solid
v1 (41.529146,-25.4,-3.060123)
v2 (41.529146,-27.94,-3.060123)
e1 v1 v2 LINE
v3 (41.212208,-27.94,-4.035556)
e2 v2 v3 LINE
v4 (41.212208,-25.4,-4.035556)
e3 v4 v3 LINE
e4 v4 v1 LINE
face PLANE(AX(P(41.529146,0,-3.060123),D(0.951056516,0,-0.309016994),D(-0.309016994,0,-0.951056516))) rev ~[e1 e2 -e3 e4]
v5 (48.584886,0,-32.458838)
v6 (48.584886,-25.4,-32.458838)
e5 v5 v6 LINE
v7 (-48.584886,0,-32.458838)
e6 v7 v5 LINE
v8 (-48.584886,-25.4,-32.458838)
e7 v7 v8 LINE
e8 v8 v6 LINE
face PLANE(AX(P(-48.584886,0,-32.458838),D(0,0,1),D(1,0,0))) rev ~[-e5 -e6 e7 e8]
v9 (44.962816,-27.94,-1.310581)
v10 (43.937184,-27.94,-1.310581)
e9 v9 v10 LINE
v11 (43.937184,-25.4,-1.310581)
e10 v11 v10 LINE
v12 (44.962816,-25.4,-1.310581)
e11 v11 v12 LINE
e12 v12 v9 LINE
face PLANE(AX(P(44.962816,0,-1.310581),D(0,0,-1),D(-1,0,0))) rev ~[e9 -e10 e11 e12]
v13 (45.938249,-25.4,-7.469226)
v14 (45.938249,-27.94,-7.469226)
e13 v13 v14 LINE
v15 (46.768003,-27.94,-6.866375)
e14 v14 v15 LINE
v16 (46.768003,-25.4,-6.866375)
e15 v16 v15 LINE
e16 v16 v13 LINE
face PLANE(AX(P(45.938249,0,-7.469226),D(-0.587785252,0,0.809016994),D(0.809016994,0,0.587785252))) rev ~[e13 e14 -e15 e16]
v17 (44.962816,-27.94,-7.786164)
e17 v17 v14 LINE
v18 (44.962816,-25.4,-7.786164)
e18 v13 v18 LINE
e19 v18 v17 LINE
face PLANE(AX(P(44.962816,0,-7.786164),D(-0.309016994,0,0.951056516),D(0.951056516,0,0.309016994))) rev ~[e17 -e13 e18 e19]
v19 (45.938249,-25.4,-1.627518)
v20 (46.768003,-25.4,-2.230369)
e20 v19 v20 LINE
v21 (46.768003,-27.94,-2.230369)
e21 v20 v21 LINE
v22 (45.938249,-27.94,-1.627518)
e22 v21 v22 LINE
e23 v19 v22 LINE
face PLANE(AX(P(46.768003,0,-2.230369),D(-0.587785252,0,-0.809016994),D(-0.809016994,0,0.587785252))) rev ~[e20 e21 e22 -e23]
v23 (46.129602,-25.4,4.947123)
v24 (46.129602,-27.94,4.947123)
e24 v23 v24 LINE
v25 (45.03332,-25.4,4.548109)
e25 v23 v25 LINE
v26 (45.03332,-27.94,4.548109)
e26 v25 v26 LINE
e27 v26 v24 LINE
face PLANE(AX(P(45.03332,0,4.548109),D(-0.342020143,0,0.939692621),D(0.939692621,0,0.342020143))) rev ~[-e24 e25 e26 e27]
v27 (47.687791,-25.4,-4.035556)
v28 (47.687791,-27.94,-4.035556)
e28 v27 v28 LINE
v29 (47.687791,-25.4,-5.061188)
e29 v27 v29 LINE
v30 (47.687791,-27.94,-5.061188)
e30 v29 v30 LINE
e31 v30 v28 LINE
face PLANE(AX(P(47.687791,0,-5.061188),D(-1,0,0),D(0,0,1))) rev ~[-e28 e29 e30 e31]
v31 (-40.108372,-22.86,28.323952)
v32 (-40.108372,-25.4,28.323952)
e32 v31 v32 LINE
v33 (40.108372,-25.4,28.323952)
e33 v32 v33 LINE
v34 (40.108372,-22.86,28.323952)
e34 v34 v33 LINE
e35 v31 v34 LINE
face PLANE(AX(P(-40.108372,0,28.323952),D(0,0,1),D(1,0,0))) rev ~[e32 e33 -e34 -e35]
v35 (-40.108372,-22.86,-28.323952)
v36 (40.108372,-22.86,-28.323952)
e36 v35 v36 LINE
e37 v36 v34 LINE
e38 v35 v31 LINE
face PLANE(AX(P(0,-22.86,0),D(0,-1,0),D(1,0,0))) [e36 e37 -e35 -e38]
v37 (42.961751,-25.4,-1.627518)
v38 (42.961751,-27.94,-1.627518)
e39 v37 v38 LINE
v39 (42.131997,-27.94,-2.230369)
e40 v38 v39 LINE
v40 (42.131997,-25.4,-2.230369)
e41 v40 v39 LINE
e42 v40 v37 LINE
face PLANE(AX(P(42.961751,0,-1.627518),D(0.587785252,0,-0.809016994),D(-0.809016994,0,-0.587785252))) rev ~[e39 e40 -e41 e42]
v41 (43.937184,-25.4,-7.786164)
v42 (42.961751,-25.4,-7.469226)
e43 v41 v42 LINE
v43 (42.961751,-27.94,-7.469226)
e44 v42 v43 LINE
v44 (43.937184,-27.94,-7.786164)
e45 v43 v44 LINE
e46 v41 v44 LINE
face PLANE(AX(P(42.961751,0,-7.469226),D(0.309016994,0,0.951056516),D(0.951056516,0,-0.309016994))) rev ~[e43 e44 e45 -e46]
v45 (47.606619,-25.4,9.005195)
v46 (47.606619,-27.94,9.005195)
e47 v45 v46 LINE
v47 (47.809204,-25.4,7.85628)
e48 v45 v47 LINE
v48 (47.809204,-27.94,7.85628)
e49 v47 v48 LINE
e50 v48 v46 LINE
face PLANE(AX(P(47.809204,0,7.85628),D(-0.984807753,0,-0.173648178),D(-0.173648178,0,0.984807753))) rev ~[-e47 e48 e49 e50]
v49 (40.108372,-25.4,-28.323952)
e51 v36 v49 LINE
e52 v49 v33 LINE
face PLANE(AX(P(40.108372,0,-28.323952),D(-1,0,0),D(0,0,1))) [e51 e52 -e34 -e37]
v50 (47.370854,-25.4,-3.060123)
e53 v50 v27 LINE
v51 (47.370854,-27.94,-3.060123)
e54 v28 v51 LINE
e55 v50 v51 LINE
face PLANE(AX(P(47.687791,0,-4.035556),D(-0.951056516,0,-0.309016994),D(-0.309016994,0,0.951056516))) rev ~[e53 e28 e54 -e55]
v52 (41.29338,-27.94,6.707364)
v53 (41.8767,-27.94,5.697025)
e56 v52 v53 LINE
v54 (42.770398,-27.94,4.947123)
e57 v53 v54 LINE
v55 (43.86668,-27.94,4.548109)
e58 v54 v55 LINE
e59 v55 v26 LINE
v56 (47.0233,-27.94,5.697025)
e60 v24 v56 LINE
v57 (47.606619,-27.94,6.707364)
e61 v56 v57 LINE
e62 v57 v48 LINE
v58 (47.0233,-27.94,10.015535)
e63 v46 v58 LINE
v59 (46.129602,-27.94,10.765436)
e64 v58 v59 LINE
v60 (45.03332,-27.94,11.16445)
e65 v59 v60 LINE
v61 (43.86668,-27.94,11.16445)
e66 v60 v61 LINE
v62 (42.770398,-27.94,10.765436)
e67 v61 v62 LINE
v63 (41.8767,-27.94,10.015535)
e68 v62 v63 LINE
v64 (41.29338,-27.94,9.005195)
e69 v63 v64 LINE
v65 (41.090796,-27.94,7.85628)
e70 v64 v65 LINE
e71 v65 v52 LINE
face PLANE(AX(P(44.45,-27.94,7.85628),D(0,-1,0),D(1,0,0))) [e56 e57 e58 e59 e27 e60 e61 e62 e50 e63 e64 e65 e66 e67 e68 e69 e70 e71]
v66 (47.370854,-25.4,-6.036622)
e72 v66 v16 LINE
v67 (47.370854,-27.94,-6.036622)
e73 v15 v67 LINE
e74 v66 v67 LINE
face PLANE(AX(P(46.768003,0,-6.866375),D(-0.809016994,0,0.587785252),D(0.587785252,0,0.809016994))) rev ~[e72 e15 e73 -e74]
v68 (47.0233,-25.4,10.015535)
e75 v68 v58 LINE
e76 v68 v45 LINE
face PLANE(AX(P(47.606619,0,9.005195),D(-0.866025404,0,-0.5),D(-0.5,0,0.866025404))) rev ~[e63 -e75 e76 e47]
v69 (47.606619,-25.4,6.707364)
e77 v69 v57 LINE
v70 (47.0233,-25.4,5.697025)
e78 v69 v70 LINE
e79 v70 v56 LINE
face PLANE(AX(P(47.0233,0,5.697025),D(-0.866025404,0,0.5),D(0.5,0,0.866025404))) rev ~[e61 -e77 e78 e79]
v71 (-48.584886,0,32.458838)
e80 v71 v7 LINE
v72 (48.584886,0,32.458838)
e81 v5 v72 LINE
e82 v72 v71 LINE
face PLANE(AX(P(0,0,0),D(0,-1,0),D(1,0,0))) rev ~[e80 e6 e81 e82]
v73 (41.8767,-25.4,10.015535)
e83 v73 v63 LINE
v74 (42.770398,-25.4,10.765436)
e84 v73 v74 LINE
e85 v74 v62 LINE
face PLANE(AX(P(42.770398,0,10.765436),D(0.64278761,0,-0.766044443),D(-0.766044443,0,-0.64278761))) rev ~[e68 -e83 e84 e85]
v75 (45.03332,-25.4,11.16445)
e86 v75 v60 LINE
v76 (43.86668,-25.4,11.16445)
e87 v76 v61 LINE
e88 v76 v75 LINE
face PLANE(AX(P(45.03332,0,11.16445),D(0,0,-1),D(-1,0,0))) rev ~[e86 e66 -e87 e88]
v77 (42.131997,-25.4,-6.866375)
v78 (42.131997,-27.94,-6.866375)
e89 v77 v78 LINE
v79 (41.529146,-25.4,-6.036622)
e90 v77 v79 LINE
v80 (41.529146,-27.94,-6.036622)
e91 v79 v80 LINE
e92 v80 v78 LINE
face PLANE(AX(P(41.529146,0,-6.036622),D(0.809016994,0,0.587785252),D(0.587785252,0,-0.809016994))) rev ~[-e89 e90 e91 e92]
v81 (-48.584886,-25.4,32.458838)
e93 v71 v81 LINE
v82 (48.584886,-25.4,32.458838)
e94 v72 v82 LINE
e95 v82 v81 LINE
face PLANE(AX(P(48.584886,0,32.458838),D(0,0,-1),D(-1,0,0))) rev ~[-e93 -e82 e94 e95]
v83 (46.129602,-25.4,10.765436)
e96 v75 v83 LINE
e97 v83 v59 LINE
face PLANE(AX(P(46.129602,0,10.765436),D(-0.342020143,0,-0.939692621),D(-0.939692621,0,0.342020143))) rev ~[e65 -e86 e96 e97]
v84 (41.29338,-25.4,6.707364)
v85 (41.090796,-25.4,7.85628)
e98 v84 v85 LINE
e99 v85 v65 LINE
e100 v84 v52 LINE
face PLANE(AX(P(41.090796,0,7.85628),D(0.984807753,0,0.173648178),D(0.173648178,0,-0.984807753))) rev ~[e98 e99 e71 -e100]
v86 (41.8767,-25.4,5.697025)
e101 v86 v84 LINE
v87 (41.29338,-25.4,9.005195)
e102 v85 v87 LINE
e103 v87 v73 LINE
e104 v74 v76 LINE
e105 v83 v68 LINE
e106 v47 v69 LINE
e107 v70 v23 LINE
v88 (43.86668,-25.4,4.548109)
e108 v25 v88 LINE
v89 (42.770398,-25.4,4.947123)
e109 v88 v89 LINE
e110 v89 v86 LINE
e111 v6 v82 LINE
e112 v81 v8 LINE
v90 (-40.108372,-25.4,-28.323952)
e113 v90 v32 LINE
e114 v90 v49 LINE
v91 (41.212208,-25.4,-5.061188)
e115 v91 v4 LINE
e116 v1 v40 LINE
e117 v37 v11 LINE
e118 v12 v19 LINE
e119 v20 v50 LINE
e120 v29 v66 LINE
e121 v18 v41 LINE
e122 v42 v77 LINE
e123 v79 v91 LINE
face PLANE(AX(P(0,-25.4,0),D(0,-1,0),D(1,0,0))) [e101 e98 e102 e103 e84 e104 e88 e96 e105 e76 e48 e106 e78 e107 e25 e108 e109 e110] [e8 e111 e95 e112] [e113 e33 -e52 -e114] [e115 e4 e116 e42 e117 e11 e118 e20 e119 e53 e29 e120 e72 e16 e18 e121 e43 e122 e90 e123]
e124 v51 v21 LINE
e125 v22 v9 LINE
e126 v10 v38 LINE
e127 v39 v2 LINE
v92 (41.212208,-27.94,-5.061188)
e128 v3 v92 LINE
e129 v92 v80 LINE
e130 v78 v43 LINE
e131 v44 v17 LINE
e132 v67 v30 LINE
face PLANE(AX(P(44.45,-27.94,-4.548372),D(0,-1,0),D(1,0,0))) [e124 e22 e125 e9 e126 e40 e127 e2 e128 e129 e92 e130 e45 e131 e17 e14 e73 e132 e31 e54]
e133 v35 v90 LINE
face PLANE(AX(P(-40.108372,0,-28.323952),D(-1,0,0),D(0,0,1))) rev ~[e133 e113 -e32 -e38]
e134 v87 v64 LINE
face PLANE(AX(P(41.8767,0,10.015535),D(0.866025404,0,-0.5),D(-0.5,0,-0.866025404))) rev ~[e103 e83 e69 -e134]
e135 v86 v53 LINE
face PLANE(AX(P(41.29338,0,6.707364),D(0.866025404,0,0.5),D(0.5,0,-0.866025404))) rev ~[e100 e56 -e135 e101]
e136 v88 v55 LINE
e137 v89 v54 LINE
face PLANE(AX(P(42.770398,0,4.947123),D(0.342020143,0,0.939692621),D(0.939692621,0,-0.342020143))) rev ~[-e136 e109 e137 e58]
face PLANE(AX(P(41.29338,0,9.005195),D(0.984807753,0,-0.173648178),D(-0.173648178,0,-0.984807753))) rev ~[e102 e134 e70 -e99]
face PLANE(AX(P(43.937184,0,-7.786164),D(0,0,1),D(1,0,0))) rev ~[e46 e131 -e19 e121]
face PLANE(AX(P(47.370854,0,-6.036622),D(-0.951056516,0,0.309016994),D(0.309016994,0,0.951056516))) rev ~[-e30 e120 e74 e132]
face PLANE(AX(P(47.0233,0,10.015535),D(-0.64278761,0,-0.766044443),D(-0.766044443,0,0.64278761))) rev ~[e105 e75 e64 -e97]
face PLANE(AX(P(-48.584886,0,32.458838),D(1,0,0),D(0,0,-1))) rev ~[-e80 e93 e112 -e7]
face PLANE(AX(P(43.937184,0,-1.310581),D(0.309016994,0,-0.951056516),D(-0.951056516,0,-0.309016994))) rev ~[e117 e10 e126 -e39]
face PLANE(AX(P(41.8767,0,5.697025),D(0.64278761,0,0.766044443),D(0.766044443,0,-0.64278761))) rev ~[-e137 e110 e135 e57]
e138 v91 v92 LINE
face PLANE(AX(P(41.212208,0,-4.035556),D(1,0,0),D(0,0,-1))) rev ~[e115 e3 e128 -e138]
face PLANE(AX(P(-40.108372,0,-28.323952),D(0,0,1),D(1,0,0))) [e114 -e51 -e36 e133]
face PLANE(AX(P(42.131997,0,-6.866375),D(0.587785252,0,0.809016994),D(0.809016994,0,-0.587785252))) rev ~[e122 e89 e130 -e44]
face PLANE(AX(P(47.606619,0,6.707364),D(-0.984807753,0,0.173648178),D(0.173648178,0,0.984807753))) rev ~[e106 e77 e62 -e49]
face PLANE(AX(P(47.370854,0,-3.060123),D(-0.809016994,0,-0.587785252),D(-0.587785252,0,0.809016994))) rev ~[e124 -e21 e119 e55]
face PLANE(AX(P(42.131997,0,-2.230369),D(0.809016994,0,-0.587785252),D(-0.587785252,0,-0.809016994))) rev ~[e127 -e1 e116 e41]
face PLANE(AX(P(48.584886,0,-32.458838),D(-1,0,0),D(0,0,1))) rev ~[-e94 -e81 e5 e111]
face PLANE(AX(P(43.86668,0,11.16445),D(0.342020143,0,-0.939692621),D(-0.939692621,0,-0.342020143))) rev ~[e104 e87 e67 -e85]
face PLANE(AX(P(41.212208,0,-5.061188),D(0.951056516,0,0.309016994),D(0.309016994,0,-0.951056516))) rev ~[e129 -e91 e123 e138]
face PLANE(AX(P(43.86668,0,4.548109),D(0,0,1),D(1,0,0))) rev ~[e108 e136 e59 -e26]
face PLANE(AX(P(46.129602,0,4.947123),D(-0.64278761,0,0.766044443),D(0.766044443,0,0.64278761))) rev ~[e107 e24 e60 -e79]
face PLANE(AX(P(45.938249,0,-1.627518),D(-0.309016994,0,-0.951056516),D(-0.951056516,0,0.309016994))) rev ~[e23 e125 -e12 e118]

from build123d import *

# Parameters (mm, degrees)
F0_W     = 80.216743052
F0_H     = 56.6479042172
F1_DEPTH = 25.4
F2_DEPTH = 22.86
F3_DEPTH = 27.94
F4_DEPTH = 27.94


# Not quite as in the source:
# - the program builds the solid bodies; features that only make, move or delete a surface that nothing else refers to are left out


with BuildPart() as f1:
    # F0 (on Front) → F1 (new body)
    with BuildSketch(Plane.XZ):
        Polygon((-48.5848858953, 32.4588380754), (-48.5848858953, -32.4588380754), (48.5848858953, -32.4588380754), (48.5848858953, 32.4588380754), (23.2139006257, 32.4588380754), align=None)
        Polygon((45.9382493502, -7.469226185), (44.9628157303, -7.7861637805), (43.9371841267, -7.7861637805), (42.9617505067, -7.469226185), (42.1319971095, -6.8663750542), (41.5291459786, -6.0366216569), (41.2122083831, -5.061188037), (41.2122083831, -4.0355564333), (41.5291459786, -3.0601228134), (42.1319971095, -2.2303694161), (42.9617505067, -1.6275182853), (43.9371841267, -1.3105806898), (44.9628157303, -1.3105806898), (45.9382493502, -1.6275182853), (46.7680027475, -2.2303694161), (47.3708538784, -3.0601228134), (47.6877914738, -4.0355564333), (47.6877914738, -5.061188037), (47.3708538784, -6.0366216569), (46.7680027475, -6.8663750542), align=None, mode=Mode.SUBTRACT)
        Rectangle(F0_W, F0_H, mode=Mode.SUBTRACT)
        Polygon((46.129602097, 4.9471233192), (45.03331964, 4.5481091365), (43.8666802169, 4.5481091365), (42.77039776, 4.9471233192), (41.8767001128, 5.6970246853), (41.2933804012, 6.7073640628), (41.0907955914, 7.8562796116), (41.2933804012, 9.0051951604), (41.8767001128, 10.0155345378), (42.77039776, 10.765435904), (43.8666802169, 11.1644500867), (45.03331964, 11.1644500867), (46.129602097, 10.765435904), (47.0232997442, 10.0155345378), (47.6066194557, 9.0051951604), (47.8092042655, 7.8562796116), (47.6066194557, 6.7073640628), (47.0232997442, 5.6970246853), align=None, mode=Mode.SUBTRACT)
    extrude(amount=F1_DEPTH)

    # F0 (on Front) → F2 (join)
    with BuildSketch(Plane.XZ):
        Rectangle(F0_W, F0_H)
    extrude(amount=F2_DEPTH)

    # F0 (on Front) → F3 (join)
    with BuildSketch(Plane.XZ):
        Polygon((43.8666802169, 4.5481091365), (45.03331964, 4.5481091365), (46.129602097, 4.9471233192), (47.0232997442, 5.6970246853), (47.6066194557, 6.7073640628), (47.8092042655, 7.8562796116), (47.6066194557, 9.0051951604), (47.0232997442, 10.0155345378), (46.129602097, 10.765435904), (45.03331964, 11.1644500867), (43.8666802169, 11.1644500867), (42.77039776, 10.765435904), (41.8767001128, 10.0155345378), (41.2933804012, 9.0051951604), (41.0907955914, 7.8562796116), (41.2933804012, 6.7073640628), (41.8767001128, 5.6970246853), (42.77039776, 4.9471233192), align=None)
    extrude(amount=F3_DEPTH)

    # F0 (on Front) → F4 (join)
    with BuildSketch(Plane.XZ):
        Polygon((43.9371841267, -7.7861637805), (44.9628157303, -7.7861637805), (45.9382493502, -7.469226185), (46.7680027475, -6.8663750542), (47.3708538784, -6.0366216569), (47.6877914738, -5.061188037), (47.6877914738, -4.0355564333), (47.3708538784, -3.0601228134), (46.7680027475, -2.2303694161), (45.9382493502, -1.6275182853), (44.9628157303, -1.3105806898), (43.9371841267, -1.3105806898), (42.9617505067, -1.6275182853), (42.1319971095, -2.2303694161), (41.5291459786, -3.0601228134), (41.2122083831, -4.0355564333), (41.2122083831, -5.061188037), (41.5291459786, -6.0366216569), (42.1319971095, -6.8663750542), (42.9617505067, -7.469226185), align=None)
    extrude(amount=F4_DEPTH)


solid = f1.part
